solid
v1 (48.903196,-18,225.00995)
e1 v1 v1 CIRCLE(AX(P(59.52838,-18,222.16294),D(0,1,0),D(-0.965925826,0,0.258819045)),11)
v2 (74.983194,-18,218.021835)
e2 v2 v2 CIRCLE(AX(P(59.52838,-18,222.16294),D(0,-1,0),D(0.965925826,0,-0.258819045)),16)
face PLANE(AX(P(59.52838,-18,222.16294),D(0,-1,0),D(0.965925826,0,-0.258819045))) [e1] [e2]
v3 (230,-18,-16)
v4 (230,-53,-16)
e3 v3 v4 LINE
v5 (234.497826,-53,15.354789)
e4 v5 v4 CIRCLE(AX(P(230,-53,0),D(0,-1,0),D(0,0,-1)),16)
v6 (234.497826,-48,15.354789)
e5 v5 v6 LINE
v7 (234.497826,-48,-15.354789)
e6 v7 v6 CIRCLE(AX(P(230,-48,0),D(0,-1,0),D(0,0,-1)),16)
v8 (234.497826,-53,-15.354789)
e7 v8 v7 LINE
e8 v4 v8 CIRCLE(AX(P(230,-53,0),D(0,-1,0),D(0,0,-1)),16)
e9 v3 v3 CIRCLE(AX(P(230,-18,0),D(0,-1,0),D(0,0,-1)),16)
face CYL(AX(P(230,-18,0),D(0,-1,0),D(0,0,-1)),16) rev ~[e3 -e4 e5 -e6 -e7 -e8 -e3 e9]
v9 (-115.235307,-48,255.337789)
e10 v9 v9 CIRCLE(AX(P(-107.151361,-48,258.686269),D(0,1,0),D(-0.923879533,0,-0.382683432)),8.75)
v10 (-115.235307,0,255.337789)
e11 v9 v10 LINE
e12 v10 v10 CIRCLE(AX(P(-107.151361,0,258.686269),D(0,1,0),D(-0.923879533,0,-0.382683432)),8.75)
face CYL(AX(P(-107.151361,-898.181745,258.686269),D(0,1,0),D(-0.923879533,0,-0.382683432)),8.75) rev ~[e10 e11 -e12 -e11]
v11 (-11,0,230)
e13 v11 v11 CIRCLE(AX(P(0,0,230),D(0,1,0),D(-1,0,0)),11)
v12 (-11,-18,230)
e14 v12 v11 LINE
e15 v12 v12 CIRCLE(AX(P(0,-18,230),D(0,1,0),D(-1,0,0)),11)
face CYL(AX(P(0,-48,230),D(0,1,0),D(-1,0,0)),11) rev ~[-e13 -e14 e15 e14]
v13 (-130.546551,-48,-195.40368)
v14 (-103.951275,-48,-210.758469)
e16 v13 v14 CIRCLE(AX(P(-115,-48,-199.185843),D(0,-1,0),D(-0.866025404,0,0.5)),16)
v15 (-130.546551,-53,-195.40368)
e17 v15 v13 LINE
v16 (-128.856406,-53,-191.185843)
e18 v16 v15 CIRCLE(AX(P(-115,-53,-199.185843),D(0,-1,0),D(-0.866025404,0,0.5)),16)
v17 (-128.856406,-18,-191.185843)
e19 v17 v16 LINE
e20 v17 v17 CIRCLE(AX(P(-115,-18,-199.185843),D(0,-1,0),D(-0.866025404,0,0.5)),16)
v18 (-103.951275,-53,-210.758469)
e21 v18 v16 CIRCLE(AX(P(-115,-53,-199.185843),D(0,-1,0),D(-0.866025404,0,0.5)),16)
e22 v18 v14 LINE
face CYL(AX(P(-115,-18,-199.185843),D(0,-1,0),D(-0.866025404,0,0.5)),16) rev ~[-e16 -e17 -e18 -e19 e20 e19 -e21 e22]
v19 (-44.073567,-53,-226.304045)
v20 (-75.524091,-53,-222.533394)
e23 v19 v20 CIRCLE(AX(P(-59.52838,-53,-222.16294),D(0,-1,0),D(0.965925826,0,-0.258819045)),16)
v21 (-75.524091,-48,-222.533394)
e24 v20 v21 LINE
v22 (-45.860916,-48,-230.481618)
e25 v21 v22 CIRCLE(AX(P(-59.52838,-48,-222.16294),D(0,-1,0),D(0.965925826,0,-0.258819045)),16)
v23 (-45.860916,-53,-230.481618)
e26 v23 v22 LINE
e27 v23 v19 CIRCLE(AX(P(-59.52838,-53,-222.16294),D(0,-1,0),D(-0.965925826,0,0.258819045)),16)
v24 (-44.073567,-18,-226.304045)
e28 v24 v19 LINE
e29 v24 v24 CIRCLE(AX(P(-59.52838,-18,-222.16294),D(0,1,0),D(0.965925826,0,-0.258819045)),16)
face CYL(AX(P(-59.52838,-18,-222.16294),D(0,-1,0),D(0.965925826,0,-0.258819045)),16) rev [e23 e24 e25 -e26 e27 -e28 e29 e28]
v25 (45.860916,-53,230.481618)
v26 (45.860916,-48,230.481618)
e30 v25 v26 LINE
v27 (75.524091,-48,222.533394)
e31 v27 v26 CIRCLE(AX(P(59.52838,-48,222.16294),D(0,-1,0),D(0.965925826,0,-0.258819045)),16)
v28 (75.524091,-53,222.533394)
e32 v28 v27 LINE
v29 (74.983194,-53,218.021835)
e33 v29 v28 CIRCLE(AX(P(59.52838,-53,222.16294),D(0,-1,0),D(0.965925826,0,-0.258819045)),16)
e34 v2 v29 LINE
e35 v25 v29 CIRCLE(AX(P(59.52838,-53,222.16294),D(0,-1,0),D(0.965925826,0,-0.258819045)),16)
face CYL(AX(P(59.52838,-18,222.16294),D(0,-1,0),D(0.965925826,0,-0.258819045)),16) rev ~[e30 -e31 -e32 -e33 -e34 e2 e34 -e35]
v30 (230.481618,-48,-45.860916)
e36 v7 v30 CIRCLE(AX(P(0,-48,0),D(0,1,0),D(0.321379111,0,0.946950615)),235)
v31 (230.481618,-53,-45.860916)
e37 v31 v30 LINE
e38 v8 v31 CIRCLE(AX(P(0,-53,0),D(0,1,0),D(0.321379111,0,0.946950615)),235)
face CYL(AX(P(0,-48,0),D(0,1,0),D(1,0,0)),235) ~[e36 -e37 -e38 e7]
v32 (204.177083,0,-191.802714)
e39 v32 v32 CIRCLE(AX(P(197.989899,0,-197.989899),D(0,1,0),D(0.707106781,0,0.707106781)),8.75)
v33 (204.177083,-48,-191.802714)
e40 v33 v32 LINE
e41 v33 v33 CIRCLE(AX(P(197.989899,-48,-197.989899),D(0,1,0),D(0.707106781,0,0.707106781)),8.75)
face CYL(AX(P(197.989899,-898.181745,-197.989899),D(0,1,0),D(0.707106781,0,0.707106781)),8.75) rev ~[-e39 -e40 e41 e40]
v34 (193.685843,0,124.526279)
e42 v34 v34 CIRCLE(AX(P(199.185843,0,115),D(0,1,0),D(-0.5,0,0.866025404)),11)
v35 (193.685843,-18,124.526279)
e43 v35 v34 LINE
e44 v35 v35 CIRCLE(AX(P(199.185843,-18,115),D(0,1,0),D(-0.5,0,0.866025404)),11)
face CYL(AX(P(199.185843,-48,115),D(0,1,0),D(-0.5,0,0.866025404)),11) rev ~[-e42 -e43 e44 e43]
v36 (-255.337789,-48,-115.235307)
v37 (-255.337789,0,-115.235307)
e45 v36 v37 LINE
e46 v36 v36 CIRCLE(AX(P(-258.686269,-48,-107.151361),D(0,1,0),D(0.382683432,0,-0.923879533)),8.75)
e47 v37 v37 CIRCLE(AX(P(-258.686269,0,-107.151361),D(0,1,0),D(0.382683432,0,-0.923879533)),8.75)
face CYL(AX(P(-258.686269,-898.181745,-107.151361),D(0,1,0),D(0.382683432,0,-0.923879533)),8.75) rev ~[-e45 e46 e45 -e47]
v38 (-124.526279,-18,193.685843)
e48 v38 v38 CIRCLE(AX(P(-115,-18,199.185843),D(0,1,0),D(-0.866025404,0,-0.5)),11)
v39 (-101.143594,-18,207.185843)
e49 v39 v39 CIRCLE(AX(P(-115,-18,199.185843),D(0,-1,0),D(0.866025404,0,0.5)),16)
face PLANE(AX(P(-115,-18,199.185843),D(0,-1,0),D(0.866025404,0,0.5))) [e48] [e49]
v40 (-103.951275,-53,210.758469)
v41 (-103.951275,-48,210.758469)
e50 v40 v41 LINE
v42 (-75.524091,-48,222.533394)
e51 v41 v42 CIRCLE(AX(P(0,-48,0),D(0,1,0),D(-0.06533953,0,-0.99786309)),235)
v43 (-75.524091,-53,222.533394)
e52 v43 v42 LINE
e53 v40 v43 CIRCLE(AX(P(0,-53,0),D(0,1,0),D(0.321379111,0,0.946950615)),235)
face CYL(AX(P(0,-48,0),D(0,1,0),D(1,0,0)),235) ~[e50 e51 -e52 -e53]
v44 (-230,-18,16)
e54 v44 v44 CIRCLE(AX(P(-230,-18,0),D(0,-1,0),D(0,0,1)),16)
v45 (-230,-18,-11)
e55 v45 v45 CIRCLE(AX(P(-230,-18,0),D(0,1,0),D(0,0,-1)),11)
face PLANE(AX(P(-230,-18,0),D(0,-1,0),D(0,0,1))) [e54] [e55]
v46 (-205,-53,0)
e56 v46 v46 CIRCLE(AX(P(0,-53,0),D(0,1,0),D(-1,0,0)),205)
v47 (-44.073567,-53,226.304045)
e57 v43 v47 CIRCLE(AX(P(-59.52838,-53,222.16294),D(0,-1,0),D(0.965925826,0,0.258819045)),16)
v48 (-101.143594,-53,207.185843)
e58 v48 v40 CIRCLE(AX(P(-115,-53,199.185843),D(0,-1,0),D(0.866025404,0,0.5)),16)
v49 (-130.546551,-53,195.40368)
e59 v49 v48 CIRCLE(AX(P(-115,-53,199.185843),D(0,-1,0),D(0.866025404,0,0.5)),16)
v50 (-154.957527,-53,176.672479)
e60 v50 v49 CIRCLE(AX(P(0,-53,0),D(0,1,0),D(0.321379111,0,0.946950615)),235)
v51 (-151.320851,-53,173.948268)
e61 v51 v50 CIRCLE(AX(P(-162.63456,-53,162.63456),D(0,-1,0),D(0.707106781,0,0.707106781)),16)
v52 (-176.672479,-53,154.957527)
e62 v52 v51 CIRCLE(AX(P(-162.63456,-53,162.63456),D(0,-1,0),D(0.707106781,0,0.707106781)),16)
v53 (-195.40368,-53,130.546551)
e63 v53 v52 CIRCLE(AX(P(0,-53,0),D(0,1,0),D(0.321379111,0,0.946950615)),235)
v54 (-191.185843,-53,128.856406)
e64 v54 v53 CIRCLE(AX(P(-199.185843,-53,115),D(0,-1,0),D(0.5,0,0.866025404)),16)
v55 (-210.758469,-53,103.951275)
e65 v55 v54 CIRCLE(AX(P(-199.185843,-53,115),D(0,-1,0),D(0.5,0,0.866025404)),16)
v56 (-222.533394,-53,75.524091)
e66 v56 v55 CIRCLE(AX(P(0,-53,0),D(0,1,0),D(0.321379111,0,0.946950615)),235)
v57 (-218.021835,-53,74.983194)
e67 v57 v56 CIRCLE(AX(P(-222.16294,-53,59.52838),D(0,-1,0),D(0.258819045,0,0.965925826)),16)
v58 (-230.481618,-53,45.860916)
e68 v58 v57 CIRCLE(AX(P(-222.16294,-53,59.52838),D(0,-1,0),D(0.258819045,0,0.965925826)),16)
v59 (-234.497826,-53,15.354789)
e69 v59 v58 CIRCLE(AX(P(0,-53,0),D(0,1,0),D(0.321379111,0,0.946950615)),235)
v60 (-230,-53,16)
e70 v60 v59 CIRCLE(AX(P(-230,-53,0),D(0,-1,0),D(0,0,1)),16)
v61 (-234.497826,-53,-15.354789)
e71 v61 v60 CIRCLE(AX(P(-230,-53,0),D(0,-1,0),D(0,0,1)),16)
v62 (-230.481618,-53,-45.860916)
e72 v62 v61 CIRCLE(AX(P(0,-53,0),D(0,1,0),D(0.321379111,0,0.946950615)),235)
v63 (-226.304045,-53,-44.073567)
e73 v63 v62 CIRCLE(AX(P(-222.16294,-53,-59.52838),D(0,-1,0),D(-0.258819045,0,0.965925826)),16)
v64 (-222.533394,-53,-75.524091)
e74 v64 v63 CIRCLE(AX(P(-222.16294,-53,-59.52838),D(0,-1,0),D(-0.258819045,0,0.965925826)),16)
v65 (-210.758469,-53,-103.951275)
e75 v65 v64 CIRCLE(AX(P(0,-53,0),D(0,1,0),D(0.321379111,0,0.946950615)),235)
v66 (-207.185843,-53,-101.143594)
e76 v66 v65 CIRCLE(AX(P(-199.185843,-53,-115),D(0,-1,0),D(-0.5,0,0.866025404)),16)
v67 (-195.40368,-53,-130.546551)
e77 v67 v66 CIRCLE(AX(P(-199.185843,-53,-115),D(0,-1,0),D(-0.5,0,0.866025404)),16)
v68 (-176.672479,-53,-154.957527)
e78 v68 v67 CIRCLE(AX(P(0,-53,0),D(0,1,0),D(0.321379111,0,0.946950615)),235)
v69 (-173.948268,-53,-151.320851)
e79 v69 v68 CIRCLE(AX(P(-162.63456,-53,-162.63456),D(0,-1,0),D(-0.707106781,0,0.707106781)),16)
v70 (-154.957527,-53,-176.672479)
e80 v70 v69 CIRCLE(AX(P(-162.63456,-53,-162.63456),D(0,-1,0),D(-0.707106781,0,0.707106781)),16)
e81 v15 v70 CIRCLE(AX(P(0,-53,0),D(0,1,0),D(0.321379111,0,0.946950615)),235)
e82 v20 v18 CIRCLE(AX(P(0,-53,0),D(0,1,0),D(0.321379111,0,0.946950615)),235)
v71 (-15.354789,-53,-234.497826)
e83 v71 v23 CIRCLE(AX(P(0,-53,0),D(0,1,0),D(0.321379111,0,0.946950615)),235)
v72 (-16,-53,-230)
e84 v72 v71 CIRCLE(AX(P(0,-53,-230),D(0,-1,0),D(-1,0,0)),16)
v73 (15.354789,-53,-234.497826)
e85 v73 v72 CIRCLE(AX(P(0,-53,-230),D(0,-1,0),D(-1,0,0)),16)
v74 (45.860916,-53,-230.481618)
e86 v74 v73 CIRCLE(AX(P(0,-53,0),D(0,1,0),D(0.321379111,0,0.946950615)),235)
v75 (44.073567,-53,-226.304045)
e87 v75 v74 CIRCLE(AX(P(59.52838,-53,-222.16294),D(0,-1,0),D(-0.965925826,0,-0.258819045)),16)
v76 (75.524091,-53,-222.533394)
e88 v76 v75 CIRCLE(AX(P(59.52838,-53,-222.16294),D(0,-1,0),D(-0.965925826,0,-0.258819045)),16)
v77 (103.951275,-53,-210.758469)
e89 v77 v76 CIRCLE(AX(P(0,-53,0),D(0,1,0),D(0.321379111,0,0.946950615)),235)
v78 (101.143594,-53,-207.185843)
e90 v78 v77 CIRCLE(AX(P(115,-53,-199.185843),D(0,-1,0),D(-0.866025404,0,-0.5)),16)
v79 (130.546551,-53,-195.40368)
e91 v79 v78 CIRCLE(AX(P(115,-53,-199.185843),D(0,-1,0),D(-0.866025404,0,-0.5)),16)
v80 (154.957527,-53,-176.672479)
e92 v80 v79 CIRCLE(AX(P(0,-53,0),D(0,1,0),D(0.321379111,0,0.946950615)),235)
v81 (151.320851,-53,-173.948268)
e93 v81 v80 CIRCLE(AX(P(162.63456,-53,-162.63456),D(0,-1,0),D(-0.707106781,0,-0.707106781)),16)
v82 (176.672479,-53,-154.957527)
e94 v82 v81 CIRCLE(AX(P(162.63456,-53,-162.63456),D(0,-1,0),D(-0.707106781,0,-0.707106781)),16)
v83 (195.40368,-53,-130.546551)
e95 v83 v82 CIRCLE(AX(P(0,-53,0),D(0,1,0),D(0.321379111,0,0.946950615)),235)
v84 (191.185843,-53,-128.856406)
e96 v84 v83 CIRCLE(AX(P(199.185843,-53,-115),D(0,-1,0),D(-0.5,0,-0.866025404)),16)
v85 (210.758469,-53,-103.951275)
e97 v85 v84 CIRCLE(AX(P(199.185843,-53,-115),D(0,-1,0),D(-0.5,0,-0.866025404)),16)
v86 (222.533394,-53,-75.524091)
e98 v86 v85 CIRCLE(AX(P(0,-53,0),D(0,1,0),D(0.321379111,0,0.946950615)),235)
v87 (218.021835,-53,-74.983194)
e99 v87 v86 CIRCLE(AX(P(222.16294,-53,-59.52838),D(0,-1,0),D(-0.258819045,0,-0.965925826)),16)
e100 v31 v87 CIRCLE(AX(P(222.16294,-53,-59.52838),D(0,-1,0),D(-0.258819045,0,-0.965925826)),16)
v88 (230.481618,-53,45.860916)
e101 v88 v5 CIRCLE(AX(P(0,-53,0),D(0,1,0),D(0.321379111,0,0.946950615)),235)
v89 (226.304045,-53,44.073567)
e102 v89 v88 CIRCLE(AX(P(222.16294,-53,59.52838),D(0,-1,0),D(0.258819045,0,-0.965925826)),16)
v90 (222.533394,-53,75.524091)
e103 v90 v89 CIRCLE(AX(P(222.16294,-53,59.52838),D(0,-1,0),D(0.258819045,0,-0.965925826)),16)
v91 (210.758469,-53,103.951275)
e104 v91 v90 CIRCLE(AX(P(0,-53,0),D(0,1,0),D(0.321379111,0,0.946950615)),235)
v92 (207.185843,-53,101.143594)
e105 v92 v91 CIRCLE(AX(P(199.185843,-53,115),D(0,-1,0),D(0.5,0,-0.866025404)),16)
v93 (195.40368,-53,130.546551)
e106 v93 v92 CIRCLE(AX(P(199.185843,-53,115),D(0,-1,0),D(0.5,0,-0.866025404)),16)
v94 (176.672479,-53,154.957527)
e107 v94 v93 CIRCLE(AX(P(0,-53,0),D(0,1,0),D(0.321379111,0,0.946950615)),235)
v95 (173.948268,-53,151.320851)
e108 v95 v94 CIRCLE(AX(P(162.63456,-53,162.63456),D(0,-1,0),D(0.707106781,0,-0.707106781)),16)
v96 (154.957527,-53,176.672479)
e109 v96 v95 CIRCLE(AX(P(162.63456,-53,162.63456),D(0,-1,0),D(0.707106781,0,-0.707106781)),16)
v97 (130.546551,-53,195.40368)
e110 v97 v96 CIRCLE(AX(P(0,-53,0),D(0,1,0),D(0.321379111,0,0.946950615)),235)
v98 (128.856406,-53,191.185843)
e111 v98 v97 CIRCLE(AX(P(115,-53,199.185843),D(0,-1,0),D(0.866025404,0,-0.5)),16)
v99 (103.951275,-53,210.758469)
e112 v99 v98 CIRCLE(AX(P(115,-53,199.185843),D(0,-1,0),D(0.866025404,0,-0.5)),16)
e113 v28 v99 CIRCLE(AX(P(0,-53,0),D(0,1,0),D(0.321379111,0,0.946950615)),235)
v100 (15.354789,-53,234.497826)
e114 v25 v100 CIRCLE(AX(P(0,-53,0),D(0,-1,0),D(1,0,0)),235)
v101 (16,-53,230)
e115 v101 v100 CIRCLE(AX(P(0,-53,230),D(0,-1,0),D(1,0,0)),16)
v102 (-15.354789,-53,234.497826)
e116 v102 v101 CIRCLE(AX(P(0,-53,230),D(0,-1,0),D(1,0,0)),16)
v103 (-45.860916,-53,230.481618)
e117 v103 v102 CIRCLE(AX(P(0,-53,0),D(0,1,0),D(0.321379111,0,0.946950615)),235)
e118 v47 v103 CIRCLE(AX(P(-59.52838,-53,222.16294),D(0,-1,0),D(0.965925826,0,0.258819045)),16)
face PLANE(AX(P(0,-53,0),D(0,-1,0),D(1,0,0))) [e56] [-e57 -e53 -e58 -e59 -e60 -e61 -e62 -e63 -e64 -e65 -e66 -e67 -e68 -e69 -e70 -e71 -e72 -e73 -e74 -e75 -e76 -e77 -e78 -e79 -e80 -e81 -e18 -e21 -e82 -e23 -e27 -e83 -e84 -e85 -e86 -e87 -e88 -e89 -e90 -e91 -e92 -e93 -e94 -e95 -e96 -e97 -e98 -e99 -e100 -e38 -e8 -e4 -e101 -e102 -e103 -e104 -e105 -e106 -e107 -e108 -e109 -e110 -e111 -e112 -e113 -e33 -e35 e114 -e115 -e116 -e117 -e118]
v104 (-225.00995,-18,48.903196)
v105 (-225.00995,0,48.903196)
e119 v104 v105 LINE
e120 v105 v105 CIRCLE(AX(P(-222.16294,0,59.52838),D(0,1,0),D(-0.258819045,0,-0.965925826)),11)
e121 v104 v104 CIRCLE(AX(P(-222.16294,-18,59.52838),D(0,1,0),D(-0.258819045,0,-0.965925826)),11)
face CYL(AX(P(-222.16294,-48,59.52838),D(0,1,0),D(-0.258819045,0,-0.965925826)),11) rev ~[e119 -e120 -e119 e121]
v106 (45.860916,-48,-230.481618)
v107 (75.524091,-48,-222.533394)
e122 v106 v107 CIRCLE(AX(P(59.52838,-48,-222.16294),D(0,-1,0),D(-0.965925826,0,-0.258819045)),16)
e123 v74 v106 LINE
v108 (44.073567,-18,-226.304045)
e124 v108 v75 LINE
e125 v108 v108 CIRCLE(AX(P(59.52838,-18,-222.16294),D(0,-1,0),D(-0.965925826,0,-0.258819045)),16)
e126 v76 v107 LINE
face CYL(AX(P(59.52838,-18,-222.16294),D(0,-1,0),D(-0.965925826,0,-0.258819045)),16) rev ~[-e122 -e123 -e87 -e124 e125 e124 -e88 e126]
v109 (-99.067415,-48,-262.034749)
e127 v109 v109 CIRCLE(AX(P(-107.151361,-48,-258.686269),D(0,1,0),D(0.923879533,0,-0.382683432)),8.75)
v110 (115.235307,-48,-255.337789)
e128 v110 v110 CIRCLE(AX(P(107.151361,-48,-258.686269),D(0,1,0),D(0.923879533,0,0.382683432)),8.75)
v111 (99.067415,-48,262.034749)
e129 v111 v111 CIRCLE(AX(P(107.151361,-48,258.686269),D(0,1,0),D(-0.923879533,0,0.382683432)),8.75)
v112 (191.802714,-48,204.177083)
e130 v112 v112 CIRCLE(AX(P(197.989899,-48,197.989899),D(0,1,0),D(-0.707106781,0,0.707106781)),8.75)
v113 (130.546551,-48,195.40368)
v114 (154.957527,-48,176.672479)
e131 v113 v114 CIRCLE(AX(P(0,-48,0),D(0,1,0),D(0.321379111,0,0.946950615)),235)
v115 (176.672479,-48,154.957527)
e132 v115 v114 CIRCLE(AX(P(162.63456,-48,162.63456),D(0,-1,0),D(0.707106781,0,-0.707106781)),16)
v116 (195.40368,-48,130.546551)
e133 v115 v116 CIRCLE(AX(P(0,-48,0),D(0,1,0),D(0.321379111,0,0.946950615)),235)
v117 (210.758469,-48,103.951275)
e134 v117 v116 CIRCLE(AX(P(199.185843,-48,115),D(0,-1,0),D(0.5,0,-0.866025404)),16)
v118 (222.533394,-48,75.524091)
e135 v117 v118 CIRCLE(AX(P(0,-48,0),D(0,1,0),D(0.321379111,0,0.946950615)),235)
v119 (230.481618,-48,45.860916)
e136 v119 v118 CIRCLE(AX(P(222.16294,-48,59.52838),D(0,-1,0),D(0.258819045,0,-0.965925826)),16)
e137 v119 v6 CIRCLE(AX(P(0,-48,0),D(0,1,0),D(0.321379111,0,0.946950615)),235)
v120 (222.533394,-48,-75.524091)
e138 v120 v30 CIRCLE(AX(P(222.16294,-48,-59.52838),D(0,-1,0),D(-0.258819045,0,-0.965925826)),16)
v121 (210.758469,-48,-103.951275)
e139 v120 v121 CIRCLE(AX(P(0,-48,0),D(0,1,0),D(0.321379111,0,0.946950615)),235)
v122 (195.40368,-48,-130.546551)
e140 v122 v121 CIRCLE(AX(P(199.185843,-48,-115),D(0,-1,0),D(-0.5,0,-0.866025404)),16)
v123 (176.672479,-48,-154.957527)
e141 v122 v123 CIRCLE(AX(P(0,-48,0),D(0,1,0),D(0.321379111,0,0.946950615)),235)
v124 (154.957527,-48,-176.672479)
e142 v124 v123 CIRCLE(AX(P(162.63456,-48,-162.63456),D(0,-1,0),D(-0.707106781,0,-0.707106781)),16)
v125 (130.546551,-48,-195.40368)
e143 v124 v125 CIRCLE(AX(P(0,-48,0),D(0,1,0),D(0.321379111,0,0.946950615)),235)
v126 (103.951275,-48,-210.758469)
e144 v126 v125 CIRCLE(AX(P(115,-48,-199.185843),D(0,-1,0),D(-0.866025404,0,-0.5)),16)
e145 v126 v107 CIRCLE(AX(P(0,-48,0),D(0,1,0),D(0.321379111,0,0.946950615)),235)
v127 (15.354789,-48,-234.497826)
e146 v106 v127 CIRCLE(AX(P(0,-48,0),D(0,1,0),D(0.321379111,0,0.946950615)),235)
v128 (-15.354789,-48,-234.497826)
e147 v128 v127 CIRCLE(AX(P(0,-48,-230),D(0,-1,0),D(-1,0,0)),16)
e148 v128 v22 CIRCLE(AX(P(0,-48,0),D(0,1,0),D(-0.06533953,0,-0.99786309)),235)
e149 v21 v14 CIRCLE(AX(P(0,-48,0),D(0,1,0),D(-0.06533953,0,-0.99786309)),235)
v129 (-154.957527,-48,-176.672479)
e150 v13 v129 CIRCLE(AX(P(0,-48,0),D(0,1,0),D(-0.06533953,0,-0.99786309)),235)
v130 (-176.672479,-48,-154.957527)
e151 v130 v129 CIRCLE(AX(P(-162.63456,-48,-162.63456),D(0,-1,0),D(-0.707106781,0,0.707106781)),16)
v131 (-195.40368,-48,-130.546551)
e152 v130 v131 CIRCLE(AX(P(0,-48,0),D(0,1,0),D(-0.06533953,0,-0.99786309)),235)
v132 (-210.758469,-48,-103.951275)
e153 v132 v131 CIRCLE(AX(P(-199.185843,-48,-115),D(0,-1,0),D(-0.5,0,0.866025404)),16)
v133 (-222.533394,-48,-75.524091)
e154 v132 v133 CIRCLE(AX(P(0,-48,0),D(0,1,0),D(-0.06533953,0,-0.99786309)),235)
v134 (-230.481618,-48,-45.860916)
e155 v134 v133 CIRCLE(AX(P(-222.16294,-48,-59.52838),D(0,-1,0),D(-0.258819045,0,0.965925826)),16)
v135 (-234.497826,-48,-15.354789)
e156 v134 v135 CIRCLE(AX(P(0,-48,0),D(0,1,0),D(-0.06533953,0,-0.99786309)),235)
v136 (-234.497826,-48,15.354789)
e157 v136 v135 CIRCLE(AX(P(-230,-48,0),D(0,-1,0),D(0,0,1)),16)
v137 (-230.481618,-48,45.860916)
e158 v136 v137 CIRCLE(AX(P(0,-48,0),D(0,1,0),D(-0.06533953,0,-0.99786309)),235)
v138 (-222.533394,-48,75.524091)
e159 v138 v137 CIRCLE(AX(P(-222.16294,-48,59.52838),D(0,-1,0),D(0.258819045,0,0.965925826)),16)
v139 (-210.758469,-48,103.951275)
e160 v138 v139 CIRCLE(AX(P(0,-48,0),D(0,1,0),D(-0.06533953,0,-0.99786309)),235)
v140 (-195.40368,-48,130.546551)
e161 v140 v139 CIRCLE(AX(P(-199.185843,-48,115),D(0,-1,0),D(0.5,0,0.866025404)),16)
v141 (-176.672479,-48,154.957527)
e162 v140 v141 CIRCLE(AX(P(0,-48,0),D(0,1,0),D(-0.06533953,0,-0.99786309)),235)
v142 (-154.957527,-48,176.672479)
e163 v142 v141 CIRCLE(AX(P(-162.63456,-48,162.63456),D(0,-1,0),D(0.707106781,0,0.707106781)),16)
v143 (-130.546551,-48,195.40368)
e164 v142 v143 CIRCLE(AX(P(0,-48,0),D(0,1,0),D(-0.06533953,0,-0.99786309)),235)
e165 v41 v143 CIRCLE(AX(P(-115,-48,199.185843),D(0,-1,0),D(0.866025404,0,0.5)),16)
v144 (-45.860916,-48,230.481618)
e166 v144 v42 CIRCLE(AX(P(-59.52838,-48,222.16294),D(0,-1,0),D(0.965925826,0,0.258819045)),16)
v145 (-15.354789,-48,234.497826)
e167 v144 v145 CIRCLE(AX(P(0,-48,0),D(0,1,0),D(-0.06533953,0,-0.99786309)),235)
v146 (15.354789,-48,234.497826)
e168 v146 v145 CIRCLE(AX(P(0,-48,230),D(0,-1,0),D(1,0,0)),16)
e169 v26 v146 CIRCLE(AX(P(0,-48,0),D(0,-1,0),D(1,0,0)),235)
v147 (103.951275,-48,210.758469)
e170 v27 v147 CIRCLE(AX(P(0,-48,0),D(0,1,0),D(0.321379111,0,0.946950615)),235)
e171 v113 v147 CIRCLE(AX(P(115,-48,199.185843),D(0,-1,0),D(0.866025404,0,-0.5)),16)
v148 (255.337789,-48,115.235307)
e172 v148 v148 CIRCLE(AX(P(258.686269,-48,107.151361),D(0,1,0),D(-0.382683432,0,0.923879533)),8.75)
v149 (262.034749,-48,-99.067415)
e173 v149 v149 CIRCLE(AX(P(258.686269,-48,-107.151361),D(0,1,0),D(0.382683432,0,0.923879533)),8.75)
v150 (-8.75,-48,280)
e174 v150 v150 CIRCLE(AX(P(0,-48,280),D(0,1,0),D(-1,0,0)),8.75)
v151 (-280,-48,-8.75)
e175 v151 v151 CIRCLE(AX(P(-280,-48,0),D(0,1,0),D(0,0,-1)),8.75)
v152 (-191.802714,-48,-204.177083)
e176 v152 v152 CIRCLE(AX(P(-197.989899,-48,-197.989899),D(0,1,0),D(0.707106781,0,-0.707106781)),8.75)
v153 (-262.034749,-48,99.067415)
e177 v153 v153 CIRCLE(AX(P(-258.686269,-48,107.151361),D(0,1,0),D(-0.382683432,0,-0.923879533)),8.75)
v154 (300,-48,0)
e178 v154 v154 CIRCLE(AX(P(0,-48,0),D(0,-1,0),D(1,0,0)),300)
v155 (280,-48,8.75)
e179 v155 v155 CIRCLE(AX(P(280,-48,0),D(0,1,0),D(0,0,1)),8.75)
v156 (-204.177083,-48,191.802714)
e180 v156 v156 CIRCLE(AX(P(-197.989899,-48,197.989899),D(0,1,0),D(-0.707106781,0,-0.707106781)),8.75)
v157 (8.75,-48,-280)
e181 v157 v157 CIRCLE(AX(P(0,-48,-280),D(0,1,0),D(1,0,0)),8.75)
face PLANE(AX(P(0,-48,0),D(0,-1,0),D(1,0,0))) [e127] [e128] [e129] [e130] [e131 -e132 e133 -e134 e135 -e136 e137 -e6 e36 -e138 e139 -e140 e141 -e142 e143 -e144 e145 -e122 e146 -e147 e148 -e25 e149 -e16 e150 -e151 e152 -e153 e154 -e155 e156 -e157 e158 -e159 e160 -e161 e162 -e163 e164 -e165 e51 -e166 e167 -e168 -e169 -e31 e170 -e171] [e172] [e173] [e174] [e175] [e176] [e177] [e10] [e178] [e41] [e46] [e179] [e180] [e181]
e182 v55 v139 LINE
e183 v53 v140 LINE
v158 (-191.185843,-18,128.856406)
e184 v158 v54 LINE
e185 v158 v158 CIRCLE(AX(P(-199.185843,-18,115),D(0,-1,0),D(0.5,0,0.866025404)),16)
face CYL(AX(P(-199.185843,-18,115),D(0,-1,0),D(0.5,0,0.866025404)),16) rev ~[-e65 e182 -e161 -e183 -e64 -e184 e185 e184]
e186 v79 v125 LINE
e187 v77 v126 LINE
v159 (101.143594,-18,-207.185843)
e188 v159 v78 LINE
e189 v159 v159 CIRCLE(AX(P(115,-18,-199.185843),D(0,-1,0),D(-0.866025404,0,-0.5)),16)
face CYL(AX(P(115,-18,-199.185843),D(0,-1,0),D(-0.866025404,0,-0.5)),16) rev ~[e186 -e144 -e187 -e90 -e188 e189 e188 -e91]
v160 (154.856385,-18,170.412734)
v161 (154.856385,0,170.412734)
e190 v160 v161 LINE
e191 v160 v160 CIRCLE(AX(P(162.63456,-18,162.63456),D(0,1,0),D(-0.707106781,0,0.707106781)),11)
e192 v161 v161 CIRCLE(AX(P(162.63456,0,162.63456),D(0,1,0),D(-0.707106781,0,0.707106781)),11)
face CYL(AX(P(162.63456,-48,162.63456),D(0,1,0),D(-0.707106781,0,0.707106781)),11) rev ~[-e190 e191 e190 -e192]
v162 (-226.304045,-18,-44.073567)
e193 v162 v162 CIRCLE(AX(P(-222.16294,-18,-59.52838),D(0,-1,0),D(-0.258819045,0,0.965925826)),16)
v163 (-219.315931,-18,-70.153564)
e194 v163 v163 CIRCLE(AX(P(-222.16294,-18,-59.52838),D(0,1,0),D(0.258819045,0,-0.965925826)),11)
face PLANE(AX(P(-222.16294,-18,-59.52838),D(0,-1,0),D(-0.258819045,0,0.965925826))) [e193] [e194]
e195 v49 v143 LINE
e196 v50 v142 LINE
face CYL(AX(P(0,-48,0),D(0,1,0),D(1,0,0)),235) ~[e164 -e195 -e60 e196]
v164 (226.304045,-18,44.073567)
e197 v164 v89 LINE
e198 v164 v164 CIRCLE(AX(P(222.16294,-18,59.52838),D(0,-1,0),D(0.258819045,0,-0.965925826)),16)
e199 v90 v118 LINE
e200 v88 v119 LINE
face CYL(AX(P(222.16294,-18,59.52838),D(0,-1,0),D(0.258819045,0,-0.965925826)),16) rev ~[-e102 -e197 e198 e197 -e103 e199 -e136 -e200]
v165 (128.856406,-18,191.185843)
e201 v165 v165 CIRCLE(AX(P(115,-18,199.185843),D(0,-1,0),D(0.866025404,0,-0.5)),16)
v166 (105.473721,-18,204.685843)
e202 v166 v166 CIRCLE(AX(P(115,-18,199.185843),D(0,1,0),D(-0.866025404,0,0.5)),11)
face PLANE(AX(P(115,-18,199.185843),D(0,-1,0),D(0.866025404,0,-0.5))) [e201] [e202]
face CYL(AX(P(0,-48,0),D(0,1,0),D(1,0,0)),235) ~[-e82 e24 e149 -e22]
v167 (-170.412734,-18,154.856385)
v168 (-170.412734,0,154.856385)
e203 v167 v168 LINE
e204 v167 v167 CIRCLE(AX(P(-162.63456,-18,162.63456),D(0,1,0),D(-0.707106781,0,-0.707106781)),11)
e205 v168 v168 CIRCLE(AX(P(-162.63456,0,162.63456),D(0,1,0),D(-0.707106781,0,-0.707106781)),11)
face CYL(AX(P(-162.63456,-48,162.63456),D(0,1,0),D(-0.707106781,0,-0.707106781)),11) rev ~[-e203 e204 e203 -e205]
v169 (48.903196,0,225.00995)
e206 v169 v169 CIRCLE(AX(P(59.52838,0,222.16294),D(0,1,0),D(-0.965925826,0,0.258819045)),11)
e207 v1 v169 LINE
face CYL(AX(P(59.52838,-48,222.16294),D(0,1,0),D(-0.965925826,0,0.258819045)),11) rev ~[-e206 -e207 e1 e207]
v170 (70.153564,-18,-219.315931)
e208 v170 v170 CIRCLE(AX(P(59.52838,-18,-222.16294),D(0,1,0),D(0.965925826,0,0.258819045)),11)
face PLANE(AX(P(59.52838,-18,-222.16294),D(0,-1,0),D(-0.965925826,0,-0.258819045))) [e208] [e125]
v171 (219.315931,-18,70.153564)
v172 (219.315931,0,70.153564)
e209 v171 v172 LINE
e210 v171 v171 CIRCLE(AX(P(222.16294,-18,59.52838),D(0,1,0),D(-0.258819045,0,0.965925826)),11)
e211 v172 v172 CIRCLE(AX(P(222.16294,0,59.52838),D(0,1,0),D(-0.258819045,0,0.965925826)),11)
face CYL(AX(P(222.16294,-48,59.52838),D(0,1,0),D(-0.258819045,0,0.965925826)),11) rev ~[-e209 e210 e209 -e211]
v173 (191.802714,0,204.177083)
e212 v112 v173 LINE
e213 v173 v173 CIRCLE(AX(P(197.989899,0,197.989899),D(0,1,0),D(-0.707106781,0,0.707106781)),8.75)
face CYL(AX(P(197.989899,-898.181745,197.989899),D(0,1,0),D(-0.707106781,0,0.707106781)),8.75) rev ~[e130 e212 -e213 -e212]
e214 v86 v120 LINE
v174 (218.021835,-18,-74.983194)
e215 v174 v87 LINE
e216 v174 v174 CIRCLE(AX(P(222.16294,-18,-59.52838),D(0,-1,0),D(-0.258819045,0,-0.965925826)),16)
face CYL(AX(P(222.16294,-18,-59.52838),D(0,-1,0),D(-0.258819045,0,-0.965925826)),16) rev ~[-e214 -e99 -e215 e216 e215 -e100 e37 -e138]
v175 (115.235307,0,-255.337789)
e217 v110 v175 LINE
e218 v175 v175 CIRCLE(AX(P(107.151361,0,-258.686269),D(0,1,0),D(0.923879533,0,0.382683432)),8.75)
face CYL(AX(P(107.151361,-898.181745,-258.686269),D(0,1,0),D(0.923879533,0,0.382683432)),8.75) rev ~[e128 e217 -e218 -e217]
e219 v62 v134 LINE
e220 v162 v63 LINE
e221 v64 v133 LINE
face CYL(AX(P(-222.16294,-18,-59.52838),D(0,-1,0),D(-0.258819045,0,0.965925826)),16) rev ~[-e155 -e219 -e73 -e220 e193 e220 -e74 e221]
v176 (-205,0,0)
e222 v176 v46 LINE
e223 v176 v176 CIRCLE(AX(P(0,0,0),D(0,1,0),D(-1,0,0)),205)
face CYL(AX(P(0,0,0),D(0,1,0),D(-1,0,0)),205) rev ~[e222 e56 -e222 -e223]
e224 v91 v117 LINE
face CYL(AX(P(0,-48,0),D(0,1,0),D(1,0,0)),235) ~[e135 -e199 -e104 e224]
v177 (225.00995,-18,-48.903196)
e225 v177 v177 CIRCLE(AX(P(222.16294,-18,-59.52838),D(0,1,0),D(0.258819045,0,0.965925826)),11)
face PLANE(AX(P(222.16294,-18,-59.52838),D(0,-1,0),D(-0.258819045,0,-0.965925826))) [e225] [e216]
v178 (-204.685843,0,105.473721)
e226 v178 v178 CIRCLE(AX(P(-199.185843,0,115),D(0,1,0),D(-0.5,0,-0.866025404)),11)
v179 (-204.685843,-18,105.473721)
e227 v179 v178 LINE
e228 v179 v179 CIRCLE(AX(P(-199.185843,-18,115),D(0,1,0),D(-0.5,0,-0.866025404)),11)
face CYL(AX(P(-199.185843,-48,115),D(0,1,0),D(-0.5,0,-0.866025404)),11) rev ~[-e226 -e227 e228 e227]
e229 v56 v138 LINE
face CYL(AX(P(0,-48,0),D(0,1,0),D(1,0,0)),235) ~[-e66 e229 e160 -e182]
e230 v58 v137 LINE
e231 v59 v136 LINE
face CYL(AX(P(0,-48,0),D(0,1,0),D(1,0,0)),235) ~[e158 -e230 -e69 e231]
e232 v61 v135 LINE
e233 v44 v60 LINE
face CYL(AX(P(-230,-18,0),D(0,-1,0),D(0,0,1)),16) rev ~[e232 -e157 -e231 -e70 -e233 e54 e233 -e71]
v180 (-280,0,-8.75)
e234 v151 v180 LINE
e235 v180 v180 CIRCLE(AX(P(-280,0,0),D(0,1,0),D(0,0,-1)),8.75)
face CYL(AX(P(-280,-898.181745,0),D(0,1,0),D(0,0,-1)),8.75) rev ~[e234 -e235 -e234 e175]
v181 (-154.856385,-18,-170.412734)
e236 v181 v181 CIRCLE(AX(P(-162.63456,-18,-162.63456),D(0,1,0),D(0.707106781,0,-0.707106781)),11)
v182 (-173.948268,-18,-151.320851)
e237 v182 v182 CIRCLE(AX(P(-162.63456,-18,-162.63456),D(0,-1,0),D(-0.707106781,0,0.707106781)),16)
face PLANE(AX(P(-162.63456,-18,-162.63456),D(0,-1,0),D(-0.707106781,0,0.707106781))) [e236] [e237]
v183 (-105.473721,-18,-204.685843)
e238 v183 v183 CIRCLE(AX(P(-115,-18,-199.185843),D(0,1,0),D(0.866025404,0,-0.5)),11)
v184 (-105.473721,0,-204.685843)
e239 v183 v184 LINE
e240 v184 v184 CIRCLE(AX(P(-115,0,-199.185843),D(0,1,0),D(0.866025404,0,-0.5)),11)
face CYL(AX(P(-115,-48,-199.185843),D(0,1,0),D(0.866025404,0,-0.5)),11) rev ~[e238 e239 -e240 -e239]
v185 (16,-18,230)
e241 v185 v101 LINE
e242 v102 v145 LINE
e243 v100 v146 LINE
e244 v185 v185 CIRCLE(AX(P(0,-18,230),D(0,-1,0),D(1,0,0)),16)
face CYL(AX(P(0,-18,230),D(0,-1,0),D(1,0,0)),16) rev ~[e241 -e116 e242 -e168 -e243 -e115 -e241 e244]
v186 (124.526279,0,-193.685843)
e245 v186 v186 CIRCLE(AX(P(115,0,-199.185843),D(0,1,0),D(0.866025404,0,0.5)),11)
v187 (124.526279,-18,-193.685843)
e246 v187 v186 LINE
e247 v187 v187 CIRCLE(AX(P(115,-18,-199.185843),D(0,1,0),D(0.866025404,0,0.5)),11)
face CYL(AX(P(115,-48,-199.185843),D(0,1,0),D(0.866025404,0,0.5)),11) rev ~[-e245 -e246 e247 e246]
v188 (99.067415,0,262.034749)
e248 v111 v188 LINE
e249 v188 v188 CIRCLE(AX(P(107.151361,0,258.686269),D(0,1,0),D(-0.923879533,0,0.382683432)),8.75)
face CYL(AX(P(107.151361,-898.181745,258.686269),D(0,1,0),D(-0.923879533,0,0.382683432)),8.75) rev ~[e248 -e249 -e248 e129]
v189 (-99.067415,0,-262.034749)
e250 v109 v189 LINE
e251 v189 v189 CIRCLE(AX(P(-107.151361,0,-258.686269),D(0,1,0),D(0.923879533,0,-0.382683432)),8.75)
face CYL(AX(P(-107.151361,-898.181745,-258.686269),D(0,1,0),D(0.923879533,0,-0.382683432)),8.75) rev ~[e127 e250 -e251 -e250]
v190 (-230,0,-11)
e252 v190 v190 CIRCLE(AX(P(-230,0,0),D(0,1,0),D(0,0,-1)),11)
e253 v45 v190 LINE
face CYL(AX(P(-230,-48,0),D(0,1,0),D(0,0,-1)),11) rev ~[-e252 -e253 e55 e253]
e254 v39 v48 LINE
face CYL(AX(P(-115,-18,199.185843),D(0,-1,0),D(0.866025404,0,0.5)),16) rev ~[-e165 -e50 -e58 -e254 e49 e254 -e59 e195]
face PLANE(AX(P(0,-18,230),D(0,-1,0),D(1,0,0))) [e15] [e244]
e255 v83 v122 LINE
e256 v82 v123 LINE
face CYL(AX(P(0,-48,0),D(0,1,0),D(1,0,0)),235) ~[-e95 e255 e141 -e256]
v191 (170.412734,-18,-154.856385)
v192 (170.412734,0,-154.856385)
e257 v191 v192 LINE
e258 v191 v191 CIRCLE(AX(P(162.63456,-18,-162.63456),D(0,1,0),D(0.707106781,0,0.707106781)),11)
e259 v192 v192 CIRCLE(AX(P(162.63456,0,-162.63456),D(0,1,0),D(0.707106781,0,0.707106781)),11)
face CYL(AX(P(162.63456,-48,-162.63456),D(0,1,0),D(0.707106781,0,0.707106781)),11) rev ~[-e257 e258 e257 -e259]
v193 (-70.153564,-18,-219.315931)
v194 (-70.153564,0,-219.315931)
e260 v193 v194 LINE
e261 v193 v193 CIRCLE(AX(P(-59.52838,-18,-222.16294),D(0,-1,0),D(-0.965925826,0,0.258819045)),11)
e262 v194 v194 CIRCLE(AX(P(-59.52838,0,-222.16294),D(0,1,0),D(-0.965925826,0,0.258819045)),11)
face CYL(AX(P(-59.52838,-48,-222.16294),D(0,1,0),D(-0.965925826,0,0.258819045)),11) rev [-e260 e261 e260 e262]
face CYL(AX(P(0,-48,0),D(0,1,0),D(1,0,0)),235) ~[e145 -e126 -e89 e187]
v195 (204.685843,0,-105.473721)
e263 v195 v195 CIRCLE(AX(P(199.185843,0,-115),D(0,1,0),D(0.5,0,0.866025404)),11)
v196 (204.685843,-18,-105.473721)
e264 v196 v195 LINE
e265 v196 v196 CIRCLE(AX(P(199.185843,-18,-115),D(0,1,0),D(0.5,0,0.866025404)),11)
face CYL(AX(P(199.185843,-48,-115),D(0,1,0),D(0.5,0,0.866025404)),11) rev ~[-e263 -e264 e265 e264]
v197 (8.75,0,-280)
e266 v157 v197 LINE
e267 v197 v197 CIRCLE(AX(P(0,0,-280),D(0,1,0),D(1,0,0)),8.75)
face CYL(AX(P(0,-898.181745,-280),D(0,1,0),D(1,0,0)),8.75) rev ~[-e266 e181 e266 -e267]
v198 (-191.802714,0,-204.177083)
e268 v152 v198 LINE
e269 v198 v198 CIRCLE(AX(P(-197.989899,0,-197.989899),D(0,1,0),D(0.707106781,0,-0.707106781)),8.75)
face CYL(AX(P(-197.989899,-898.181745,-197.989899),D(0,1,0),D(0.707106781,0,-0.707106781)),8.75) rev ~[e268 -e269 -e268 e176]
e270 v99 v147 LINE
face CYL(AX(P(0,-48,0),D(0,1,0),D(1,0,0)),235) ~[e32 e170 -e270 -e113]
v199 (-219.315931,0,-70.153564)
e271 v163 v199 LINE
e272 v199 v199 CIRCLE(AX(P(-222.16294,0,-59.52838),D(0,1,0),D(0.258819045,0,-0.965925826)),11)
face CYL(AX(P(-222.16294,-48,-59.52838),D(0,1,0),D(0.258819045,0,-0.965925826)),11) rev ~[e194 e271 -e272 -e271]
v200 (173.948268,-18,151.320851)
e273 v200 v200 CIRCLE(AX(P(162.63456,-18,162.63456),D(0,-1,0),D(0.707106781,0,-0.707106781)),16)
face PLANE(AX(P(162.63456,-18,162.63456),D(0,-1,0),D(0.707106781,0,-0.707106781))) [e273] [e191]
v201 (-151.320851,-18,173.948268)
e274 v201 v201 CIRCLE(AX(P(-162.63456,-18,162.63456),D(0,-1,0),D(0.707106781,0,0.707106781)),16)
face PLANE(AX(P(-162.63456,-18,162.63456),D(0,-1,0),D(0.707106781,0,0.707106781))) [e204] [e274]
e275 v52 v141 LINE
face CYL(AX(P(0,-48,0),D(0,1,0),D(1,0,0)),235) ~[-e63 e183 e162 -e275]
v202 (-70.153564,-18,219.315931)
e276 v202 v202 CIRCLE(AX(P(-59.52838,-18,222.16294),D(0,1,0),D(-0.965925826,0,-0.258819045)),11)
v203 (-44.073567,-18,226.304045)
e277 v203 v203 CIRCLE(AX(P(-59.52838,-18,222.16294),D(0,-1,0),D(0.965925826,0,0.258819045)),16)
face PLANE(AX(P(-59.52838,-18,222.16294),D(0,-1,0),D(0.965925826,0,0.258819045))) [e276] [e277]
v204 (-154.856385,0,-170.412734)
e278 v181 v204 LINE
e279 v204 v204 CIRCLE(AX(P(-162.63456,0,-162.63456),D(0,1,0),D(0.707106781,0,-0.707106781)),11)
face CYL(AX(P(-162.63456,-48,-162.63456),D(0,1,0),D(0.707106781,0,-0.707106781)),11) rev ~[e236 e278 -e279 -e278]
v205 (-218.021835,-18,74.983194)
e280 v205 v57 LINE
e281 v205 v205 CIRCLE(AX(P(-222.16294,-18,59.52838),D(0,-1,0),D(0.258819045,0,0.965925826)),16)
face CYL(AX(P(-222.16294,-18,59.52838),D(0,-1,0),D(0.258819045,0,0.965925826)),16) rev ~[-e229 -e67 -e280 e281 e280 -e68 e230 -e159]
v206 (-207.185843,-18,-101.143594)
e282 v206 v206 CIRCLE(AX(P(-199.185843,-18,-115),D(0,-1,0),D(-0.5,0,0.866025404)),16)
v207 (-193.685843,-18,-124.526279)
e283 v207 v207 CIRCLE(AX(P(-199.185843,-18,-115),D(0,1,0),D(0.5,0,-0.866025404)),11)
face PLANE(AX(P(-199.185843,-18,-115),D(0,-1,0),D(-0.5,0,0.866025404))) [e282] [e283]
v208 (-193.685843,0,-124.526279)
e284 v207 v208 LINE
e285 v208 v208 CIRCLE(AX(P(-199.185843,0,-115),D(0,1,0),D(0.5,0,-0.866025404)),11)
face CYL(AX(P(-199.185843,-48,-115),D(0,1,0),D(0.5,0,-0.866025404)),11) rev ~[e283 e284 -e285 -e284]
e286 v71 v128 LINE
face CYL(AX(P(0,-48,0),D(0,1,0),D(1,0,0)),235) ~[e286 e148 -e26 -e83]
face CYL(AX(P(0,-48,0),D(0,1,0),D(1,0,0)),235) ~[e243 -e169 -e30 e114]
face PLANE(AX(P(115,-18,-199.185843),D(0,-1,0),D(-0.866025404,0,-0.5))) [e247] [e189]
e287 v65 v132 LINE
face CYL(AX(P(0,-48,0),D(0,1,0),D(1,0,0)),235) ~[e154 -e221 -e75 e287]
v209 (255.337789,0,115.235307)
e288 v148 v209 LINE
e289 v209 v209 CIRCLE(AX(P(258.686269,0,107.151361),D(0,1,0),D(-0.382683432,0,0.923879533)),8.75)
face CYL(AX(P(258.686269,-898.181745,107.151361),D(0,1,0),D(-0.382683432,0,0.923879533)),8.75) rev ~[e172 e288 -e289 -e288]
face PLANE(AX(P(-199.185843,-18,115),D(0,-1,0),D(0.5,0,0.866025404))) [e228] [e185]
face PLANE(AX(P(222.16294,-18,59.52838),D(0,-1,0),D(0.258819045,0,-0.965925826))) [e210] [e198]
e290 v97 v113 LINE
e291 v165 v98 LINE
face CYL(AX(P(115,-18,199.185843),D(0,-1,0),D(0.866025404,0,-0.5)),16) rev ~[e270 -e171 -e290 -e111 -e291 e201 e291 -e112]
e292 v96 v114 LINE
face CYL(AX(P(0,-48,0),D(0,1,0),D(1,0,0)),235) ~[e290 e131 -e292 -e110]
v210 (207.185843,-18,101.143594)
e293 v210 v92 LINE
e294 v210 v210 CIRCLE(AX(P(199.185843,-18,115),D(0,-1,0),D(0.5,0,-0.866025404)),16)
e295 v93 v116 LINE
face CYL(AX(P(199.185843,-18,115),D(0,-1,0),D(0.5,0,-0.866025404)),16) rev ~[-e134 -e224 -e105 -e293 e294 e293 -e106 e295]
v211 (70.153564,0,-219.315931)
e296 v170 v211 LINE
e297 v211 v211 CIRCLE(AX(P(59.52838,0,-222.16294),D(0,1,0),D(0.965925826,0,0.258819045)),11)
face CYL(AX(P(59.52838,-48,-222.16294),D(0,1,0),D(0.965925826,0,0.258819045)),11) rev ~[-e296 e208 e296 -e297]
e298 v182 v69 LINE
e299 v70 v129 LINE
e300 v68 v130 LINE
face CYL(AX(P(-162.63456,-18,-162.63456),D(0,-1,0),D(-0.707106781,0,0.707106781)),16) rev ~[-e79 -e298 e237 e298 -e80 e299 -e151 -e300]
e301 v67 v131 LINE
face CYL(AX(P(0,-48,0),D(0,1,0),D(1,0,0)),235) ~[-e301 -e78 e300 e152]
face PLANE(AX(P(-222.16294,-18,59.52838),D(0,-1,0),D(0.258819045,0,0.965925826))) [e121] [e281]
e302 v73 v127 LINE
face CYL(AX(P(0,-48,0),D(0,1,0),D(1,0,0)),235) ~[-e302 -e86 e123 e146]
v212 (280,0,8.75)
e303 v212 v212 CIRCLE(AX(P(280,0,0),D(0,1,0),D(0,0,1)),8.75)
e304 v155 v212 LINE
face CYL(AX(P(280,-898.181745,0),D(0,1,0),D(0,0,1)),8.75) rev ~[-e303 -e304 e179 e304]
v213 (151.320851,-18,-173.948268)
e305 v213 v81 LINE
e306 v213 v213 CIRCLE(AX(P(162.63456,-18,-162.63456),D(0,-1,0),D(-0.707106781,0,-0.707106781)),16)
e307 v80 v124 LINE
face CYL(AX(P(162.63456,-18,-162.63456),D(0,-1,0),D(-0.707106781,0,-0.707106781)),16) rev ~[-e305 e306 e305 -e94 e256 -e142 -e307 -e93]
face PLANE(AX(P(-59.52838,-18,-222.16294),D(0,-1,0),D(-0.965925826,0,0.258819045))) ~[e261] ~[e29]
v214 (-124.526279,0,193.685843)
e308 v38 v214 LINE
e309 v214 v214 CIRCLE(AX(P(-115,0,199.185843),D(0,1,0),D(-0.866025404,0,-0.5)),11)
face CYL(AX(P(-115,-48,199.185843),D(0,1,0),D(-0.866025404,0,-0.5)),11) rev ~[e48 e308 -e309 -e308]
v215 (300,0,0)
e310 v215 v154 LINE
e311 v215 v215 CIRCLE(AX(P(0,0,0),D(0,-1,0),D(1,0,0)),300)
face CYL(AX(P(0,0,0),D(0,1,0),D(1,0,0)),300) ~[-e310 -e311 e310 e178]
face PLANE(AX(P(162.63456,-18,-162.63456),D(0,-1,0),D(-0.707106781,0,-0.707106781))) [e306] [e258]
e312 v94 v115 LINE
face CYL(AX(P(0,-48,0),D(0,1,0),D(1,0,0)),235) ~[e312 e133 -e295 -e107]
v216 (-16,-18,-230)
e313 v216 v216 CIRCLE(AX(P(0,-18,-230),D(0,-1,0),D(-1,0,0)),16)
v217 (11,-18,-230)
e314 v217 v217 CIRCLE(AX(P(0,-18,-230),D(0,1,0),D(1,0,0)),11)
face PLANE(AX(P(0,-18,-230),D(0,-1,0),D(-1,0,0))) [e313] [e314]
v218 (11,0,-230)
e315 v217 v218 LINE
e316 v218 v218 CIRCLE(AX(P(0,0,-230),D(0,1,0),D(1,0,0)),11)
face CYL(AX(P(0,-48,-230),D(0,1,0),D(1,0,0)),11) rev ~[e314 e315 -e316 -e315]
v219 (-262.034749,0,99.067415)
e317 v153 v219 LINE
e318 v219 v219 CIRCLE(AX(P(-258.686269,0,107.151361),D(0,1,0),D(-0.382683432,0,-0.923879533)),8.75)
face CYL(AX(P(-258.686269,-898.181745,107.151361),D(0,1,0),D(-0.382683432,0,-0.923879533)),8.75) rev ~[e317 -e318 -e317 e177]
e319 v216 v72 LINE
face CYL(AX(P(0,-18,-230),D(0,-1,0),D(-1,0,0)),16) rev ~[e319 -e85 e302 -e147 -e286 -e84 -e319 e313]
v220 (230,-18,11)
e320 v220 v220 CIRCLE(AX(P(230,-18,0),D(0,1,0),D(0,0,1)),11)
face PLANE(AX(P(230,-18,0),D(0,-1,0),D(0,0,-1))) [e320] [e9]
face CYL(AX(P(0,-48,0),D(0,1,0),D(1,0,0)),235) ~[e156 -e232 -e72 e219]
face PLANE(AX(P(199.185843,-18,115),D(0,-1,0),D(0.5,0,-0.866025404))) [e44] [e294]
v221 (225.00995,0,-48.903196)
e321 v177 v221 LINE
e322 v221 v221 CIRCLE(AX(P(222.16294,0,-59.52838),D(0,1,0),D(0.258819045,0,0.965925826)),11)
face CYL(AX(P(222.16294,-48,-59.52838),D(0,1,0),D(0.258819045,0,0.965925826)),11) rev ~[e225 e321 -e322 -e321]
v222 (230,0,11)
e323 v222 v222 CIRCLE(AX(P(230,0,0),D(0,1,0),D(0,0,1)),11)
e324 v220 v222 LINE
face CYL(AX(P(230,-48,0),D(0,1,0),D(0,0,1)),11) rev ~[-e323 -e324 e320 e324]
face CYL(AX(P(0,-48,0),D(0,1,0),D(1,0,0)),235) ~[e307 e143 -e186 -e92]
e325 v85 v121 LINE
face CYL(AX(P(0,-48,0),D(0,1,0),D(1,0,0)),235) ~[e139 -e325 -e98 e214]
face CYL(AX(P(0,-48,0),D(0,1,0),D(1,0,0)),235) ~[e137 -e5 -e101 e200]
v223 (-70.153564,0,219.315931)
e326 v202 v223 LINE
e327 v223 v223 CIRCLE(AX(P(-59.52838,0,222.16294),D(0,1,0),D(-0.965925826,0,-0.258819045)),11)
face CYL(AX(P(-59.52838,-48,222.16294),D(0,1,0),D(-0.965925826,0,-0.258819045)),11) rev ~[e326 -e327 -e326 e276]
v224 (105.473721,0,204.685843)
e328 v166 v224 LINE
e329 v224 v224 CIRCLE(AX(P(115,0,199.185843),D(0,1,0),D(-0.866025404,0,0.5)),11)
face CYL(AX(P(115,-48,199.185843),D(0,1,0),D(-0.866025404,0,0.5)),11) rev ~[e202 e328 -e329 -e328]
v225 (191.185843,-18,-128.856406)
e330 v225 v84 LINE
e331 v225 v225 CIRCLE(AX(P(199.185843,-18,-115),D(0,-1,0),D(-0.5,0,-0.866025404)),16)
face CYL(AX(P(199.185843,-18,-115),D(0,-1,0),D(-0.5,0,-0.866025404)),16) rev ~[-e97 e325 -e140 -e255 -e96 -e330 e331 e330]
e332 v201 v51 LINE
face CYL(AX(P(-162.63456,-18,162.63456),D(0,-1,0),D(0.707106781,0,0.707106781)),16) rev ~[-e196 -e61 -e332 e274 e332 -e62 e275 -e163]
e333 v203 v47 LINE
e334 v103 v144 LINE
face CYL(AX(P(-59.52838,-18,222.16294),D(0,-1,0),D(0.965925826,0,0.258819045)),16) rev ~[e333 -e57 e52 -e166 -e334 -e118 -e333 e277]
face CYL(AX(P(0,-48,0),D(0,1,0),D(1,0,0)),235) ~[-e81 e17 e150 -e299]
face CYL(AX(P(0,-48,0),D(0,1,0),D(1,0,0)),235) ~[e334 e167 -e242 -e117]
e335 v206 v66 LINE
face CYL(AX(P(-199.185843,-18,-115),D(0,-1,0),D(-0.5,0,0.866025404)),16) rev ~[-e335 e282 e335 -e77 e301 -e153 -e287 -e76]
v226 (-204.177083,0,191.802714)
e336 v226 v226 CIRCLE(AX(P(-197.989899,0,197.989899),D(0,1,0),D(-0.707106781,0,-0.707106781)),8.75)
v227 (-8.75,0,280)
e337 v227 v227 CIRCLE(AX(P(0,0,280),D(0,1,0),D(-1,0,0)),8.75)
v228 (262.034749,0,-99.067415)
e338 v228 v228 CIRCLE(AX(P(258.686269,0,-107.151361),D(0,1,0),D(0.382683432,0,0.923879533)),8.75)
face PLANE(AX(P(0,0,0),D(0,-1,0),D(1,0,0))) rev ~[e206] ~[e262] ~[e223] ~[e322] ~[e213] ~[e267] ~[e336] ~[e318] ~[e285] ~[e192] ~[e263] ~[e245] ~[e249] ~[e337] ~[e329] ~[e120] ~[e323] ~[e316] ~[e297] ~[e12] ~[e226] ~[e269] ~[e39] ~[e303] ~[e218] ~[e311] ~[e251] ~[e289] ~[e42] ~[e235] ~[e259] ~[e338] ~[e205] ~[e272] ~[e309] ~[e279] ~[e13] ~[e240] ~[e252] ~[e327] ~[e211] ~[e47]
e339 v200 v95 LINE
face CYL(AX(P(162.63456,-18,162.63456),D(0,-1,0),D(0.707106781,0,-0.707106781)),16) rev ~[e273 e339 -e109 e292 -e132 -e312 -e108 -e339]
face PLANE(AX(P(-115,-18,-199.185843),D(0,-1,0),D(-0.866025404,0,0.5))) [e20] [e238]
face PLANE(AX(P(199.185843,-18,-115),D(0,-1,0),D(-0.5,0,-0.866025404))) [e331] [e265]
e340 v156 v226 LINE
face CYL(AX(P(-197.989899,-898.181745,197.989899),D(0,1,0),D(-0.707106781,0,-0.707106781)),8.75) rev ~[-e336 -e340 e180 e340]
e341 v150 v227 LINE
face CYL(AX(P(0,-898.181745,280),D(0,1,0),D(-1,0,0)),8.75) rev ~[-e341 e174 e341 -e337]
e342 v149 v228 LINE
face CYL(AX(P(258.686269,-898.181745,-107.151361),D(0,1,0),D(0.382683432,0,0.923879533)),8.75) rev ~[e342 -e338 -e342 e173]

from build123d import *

# Parameters (mm, degrees)
F0_R            = 300
F1_DEPTH        = 48
F2_R            = 235
F3_DEPTH        = 5
F5_D            = 17.5
F5_COPIES_COUNT = 16
F6_R            = 205
F7_DEPTH        = 53.001
F9_D            = 22
F9_START        = 5
F9_CBORE_D      = 32
F9_CBORE_DEPTH  = 30
F9_COPIES_COUNT = 24


# Not quite as in the source:
# - a pattern or mirror of a feature is missing from the dataset's text; its kind, count and spacing are read off the source's solid


with BuildPart() as f1:
    # F0 (on Front) → F1 (new body)
    with BuildSketch(Plane.XZ):
        Circle(F0_R)
    extrude(amount=F1_DEPTH)

    # F2 (on face) → F3 (join)
    with BuildSketch(Plane.XZ.offset(48)):
        Circle(F2_R)
    extrude(amount=F3_DEPTH)

    # F5 (through all)
    with Locations(Plane.XZ.offset(48)):
        with Locations((0, 280)):
            f5 = Hole(F5_D / 2)

    # F5_copies: F5 ×16 about axis
    f5_copies_axis = Axis((0, 0, 0), (0, 1, 0))
    for i in range(1, F5_COPIES_COUNT):
        add(f5.rotate(f5_copies_axis, i * 360 / F5_COPIES_COUNT), mode=Mode.SUBTRACT)

    # F6 (on face) → F7 (cut, through all)
    with BuildSketch(Plane(origin=(0, 0, 0), x_dir=(-1, 0, 0), z_dir=(0, 1, 0))):
        Circle(F6_R)
    extrude(amount=-F7_DEPTH, mode=Mode.SUBTRACT)

    # F9 (through all)
    # its depths count from where the whole tool has entered the part; down to there all is cleared
    with Locations(Plane.XZ.offset(53).offset(-F9_START)):
        with Locations((0, 230)):
            f9 = CounterBoreHole(F9_D / 2, F9_CBORE_D / 2, F9_CBORE_DEPTH)

    # F9_copies: F9 ×24 about axis
    f9_copies_axis = Axis((0, 0, 0), (0, 1, 0))
    for i in range(1, F9_COPIES_COUNT):
        add(f9.rotate(f9_copies_axis, i * 360 / F9_COPIES_COUNT), mode=Mode.SUBTRACT)

    # F9_copies1: F9 across plane
    add(f9.mirror(Plane(origin=(0, 0, 0), x_dir=(-0.9914448614, 0, 0.1305261922), z_dir=(-0.1305261922, 0, -0.9914448614))), mode=Mode.SUBTRACT)


solid = f1.part
